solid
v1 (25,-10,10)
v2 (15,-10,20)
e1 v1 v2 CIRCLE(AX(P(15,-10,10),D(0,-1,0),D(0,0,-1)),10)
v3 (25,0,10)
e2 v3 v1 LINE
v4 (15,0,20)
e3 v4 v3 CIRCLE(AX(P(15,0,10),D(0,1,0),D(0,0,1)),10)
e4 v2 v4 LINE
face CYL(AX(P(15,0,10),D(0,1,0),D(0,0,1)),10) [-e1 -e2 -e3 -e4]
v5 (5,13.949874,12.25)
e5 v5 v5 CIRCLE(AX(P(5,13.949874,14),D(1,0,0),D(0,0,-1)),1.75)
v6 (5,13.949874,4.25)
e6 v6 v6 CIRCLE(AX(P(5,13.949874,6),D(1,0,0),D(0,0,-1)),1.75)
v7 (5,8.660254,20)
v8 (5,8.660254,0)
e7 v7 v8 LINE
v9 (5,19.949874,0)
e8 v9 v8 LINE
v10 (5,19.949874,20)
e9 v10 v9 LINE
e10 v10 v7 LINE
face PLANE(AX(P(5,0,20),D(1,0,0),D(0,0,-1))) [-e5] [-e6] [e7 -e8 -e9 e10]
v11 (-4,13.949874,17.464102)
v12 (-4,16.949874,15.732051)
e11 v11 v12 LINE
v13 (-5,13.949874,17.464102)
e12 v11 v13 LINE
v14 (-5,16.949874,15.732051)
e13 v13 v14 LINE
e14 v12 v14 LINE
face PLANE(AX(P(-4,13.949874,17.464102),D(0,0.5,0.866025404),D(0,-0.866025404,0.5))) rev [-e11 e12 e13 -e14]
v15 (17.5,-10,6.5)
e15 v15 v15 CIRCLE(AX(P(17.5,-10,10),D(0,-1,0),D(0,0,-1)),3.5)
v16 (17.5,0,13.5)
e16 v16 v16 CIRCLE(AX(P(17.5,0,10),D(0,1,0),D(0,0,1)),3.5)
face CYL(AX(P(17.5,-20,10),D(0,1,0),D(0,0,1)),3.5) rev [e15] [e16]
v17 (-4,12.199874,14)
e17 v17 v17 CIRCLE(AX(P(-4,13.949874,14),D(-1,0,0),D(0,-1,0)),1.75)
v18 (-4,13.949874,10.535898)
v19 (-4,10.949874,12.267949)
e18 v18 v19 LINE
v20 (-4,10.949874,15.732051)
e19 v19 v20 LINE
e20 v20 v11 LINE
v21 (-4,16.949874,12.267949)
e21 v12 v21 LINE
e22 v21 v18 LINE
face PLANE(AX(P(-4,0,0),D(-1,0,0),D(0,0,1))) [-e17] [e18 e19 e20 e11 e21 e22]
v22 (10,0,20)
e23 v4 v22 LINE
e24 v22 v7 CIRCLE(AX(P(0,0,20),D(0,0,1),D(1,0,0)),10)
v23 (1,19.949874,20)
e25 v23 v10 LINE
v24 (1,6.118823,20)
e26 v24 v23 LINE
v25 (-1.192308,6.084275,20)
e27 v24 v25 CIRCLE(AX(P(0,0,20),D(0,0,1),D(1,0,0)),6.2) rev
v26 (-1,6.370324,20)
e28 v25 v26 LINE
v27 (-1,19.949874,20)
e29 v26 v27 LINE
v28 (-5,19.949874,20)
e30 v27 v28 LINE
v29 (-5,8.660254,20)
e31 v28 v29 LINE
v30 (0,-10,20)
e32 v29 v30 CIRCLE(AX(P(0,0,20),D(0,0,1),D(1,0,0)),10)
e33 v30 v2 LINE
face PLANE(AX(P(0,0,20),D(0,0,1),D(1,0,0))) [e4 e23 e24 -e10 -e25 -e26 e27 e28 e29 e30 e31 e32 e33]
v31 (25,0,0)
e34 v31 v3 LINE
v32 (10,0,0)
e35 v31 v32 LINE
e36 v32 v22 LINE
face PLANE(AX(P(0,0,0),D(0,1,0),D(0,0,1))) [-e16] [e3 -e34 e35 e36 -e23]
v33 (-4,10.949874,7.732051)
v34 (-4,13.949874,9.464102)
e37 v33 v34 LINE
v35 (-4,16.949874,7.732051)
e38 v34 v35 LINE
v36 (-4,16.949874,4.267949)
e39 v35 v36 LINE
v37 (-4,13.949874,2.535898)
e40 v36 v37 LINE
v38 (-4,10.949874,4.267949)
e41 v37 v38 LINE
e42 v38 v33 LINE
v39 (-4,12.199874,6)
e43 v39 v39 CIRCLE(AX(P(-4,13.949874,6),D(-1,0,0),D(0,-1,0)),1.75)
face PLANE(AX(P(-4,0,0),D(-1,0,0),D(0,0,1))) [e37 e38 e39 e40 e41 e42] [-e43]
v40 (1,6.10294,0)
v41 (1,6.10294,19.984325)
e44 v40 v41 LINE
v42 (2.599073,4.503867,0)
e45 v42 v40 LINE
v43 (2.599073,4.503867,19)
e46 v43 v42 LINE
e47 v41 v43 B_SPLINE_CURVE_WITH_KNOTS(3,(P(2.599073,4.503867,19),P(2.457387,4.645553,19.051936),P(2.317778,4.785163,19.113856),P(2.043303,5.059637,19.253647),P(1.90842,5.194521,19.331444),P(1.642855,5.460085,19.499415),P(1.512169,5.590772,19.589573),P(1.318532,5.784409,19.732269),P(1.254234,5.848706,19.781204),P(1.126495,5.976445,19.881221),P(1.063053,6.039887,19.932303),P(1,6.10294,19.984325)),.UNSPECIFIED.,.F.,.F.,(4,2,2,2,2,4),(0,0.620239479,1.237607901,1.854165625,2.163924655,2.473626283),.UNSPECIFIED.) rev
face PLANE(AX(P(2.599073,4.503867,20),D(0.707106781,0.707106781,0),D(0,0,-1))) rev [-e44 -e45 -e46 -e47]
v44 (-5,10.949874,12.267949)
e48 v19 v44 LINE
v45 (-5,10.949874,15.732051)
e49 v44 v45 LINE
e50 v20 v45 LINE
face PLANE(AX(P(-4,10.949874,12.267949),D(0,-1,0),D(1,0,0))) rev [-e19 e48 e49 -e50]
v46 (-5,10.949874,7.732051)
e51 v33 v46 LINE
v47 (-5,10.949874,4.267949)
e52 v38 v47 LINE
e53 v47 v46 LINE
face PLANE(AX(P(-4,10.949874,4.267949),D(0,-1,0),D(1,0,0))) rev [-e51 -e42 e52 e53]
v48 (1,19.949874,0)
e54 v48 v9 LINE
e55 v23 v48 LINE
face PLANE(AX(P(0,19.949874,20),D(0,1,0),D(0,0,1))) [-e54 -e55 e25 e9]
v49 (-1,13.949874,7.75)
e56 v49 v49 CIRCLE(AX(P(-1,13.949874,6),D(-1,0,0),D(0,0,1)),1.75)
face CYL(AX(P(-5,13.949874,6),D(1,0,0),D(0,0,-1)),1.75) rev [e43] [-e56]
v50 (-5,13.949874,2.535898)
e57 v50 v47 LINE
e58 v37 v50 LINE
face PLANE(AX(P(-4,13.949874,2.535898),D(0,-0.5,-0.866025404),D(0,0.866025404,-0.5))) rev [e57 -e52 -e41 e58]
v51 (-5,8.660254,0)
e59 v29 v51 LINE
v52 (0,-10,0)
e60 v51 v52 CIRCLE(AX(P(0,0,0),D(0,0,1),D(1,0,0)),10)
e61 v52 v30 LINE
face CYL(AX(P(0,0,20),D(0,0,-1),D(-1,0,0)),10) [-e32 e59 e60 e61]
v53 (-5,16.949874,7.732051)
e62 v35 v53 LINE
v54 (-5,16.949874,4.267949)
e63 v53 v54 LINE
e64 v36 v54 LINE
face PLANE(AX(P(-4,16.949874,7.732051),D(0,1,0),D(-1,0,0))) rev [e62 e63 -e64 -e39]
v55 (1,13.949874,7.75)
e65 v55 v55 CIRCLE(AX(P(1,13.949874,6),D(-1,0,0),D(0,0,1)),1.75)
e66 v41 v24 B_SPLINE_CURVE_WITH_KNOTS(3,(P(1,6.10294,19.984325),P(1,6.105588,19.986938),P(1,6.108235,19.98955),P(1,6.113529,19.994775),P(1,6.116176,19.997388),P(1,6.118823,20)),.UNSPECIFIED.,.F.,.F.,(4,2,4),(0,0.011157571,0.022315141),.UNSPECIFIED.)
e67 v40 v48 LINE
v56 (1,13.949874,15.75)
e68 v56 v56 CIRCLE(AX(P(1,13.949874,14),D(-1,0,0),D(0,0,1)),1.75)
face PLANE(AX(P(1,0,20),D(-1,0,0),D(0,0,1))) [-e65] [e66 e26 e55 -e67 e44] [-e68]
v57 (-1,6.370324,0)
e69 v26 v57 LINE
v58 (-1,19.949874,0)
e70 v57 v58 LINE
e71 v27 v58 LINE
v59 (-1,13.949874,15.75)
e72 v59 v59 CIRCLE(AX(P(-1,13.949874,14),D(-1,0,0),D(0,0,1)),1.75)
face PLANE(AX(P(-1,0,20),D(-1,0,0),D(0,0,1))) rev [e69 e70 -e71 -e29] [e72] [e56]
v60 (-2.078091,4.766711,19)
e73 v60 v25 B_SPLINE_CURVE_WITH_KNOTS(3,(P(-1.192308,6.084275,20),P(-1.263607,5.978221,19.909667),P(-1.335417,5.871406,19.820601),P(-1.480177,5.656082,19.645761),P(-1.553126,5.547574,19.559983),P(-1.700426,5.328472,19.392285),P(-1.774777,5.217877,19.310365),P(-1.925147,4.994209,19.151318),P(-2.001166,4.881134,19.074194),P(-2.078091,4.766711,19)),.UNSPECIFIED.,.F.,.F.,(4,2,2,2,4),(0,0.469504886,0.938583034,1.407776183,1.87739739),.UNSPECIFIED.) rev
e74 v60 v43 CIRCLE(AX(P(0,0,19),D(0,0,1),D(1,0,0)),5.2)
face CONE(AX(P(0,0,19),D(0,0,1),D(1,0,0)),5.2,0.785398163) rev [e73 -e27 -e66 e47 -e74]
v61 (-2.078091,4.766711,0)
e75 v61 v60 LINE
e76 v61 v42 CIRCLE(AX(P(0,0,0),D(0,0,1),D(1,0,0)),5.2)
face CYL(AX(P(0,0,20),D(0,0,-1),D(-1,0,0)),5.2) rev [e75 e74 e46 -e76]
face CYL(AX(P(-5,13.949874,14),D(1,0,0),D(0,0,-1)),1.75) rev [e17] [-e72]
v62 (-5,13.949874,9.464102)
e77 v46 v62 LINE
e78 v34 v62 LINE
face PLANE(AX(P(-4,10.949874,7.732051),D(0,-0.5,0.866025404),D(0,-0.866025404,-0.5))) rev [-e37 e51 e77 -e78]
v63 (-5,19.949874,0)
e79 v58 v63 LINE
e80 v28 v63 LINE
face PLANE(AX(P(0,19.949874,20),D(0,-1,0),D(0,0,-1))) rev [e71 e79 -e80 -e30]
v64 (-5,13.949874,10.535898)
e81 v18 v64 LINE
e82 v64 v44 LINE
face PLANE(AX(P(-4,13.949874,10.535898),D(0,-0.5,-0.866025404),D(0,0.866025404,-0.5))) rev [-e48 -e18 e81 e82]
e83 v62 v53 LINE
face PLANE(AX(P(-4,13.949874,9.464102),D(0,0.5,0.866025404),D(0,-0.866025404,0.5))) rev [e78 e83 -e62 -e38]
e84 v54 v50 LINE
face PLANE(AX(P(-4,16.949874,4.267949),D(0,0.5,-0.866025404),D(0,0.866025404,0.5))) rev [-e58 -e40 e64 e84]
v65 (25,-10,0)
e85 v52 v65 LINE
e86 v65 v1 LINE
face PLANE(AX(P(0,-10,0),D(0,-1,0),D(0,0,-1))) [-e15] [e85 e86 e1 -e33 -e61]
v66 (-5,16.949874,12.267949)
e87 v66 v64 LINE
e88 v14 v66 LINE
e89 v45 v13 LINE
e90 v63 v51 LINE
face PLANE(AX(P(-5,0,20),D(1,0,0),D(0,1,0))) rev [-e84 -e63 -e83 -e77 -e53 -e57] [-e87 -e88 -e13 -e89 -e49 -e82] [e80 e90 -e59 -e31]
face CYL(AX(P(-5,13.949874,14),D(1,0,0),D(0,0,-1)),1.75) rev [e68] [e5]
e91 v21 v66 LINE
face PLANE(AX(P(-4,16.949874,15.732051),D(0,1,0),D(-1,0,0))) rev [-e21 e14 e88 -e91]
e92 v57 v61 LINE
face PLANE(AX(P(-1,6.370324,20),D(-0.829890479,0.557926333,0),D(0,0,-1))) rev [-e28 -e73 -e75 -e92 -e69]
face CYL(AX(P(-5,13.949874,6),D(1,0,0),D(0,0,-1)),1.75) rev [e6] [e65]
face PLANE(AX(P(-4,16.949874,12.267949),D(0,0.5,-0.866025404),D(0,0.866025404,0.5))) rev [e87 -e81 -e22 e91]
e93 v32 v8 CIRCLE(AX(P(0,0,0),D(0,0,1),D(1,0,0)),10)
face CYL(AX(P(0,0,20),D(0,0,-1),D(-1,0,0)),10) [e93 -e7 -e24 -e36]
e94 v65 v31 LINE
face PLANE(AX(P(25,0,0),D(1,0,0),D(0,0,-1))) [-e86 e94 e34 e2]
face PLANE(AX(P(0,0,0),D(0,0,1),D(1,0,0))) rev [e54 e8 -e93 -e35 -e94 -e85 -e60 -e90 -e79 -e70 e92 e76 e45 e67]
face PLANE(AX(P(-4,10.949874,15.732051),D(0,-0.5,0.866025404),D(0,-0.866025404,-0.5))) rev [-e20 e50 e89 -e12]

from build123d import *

# Parameters (mm, degrees)
DODANIE_WYCI_GNI_CIE1_DEPTH = 20
SFAZOWANIE1_SIZE            = 1.267383774
SFAZOWANIE1_SIZE_2          = 1
SZKIC2_R                    = 1.75
WYTNIJ_WYCI_GNI_CIE1_DEPTH  = 10
WYTNIJ_WYCI_GNI_CIE2_START  = -1
SZKIC3_R                    = 1.75
WYTNIJ_WYCI_GNI_CIE2_DEPTH  = 1
DODANIE_WYCI_GNI_CIE2_START = -20
DODANIE_WYCI_GNI_CIE2_DEPTH = 20
SZKIC5_R                    = 3.5
WYTNIJ_WYCI_GNI_CIE3_DEPTH  = 20
ZAOKR_GLENIE1_R             = 10


with BuildPart() as part:
    # Szkic1 → Dodanie-wyciągnięcie1 (new body)
    with BuildSketch(Plane.XY):
        with BuildLine():
            ThreePointArc((5.2, 0), (-3.304542328, -4.01497198), (-1, 5.102940329))
            Line((-1, 5.102940329), (-1, 9.949874371))
            ThreePointArc((-1, 9.949874371), (-3.068514323, 9.517574263), (-5, 8.660254038))
            ThreePointArc((-5, 8.660254038), (-5, -8.660254038), (10, 0))
            ThreePointArc((10, 0), (8.660254038, 5), (5, 8.660254038))
            ThreePointArc((5, 8.660254038), (3.068514323, 9.517574263), (1, 9.949874371))
            Line((1, 9.949874371), (1, 5.102940329))
            ThreePointArc((1, 5.102940329), (4.01497198, 3.304542328), (5.2, 0))
        make_face()
        with BuildLine():
            ThreePointArc((-5, 8.660254038), (-3.068514323, 9.517574263), (-1, 9.949874371))
            Line((-1, 9.949874371), (-1, 19.949874371))
            Line((-1, 19.949874371), (-5, 19.949874371))
            Line((-5, 19.949874371), (-5, 8.660254038))
        make_face()
        with BuildLine():
            Line((1, 19.949874371), (1, 9.949874371))
            ThreePointArc((1, 9.949874371), (3.068514323, 9.517574263), (5, 8.660254038))
            Line((5, 8.660254038), (5, 19.949874371))
            Line((5, 19.949874371), (1, 19.949874371))
        make_face()
    extrude(amount=DODANIE_WYCI_GNI_CIE1_DEPTH)

    # Sfazowanie1
    # the kernel refuses this chamfer: 1.267383774, 1 mm, written as the material it takes off along each edge
    with BuildSketch(Plane(origin=(-1, 5.102940329, -3.274401996), x_dir=(0, 1, 0), z_dir=(0, 0, 1))) as sfazowanie1_piece_1:
        with BuildLine():
            Line((SFAZOWANIE1_SIZE, 0), (-0.336229117, 1.078091485))
            ThreePointArc((-0.336229117, 1.078091485), (-0.144735056, 0.567227001), (0, 0))
            Line((0, 0), (SFAZOWANIE1_SIZE, 0))
        make_face()
    extrude(amount=26.548803992, mode=Mode.SUBTRACT)
    with BuildSketch(Plane(origin=(1, 5.102940329, -4.38469538), x_dir=(0.9364406344520153, -0.35082607962793627, 0), z_dir=(0, 0, 1))) as sfazowanie1_piece_2:
        with BuildLine():
            Line((1.707607831, 0), (-SFAZOWANIE1_SIZE_2 * 0.350826079628, SFAZOWANIE1_SIZE_2 * 0.936440634452))
            Line((-SFAZOWANIE1_SIZE_2 * 0.350826079628, SFAZOWANIE1_SIZE_2 * 0.936440634452), (0, 0))
            ThreePointArc((0, 0), (0.877241421, 0.070520422), (1.707607831, 0))
        make_face()
    extrude(amount=28.76939076, mode=Mode.SUBTRACT)
    # the kernel refuses this chamfer: 1.267383774, 1 mm, written as the material it takes off along each edge
    with BuildSketch(Plane(origin=(0, 0, 20), x_dir=(0.05297189927018693, 0.9985960033405447, 0), z_dir=(0.9985960033405447, -0.05297189927018693, 0))) as sfazowanie1_2_piece_1:
        Polygon((5.2 + SFAZOWANIE1_SIZE_2, 0), (5.2, -SFAZOWANIE1_SIZE_2), (5.2, 0), align=None)
    revolve(axis=Axis((0, 0, 20), (0, 0, 1)), revolution_arc=359.64, mode=Mode.SUBTRACT)

    # Szkic2 → Wytnij-wyciągnięcie1 (cut)
    with BuildSketch(Plane(origin=(5, 0, 0), x_dir=(0, 0, -1), z_dir=(1, 0, 0))):
        with Locations((-14, 13.949874371)):
            Circle(SZKIC2_R)
        with Locations((-6, 13.949874371)):
            Circle(SZKIC2_R)
    extrude(amount=-WYTNIJ_WYCI_GNI_CIE1_DEPTH, mode=Mode.SUBTRACT)

    # Szkic3 → Wytnij-wyciągnięcie2 (cut)
    # profile 1 of 2: a face of its own
    with BuildSketch(Plane.ZY.offset(5).offset(WYTNIJ_WYCI_GNI_CIE2_START)):
        Polygon((9.464101615, 13.949874371), (7.732050808, 16.949874371), (4.267949192, 16.949874371), (2.535898385, 13.949874371), (4.267949192, 10.949874371), (7.732050808, 10.949874371), align=None)
        with Locations(Location((6, 13.949874371, 0), (0, 0, 270))):
            Circle(SZKIC3_R, mode=Mode.SUBTRACT)
    # profile 2 of 2: a face of its own
    with BuildSketch(Plane.ZY.offset(5).offset(WYTNIJ_WYCI_GNI_CIE2_START)):
        Polygon((10.535898385, 13.949874371), (12.267949192, 10.949874371), (15.732050808, 10.949874371), (17.464101615, 13.949874371), (15.732050808, 16.949874371), (12.267949192, 16.949874371), align=None)
        with Locations(Location((14, 13.949874371, 0), (0, 0, 270))):
            Circle(SZKIC3_R, mode=Mode.SUBTRACT)
    extrude(amount=WYTNIJ_WYCI_GNI_CIE2_DEPTH, mode=Mode.SUBTRACT)

    # Szkic4 → Dodanie-wyciągnięcie2 (add)
    with BuildSketch(Plane.XY.offset(20).offset(DODANIE_WYCI_GNI_CIE2_START)):
        with BuildLine():
            ThreePointArc((10, 0), (7.071067812, -7.071067812), (0, -10))
            Line((0, -10), (25, -10))
            Line((25, -10), (25, 0))
            Line((25, 0), (10, 0))
        make_face()
    extrude(amount=DODANIE_WYCI_GNI_CIE2_DEPTH)

    # Szkic5 → Wytnij-wyciągnięcie3 (cut)
    with BuildSketch(Plane(origin=(0, 0, 0), x_dir=(1, 0, 0), z_dir=(0, 1, 0))):
        with Locations(Location((17.5, -10, 0), (0, 0, 270))):
            Circle(SZKIC5_R)
    extrude(amount=-WYTNIJ_WYCI_GNI_CIE3_DEPTH, mode=Mode.SUBTRACT)

    # Zaokrąglenie1
    zaokr_glenie1_edges = [part.edges().sort_by_distance(p)[0] for p in [
        (25, -5, 20),
    ]]
    fillet(zaokr_glenie1_edges, radius=ZAOKR_GLENIE1_R)


solid = part.part
